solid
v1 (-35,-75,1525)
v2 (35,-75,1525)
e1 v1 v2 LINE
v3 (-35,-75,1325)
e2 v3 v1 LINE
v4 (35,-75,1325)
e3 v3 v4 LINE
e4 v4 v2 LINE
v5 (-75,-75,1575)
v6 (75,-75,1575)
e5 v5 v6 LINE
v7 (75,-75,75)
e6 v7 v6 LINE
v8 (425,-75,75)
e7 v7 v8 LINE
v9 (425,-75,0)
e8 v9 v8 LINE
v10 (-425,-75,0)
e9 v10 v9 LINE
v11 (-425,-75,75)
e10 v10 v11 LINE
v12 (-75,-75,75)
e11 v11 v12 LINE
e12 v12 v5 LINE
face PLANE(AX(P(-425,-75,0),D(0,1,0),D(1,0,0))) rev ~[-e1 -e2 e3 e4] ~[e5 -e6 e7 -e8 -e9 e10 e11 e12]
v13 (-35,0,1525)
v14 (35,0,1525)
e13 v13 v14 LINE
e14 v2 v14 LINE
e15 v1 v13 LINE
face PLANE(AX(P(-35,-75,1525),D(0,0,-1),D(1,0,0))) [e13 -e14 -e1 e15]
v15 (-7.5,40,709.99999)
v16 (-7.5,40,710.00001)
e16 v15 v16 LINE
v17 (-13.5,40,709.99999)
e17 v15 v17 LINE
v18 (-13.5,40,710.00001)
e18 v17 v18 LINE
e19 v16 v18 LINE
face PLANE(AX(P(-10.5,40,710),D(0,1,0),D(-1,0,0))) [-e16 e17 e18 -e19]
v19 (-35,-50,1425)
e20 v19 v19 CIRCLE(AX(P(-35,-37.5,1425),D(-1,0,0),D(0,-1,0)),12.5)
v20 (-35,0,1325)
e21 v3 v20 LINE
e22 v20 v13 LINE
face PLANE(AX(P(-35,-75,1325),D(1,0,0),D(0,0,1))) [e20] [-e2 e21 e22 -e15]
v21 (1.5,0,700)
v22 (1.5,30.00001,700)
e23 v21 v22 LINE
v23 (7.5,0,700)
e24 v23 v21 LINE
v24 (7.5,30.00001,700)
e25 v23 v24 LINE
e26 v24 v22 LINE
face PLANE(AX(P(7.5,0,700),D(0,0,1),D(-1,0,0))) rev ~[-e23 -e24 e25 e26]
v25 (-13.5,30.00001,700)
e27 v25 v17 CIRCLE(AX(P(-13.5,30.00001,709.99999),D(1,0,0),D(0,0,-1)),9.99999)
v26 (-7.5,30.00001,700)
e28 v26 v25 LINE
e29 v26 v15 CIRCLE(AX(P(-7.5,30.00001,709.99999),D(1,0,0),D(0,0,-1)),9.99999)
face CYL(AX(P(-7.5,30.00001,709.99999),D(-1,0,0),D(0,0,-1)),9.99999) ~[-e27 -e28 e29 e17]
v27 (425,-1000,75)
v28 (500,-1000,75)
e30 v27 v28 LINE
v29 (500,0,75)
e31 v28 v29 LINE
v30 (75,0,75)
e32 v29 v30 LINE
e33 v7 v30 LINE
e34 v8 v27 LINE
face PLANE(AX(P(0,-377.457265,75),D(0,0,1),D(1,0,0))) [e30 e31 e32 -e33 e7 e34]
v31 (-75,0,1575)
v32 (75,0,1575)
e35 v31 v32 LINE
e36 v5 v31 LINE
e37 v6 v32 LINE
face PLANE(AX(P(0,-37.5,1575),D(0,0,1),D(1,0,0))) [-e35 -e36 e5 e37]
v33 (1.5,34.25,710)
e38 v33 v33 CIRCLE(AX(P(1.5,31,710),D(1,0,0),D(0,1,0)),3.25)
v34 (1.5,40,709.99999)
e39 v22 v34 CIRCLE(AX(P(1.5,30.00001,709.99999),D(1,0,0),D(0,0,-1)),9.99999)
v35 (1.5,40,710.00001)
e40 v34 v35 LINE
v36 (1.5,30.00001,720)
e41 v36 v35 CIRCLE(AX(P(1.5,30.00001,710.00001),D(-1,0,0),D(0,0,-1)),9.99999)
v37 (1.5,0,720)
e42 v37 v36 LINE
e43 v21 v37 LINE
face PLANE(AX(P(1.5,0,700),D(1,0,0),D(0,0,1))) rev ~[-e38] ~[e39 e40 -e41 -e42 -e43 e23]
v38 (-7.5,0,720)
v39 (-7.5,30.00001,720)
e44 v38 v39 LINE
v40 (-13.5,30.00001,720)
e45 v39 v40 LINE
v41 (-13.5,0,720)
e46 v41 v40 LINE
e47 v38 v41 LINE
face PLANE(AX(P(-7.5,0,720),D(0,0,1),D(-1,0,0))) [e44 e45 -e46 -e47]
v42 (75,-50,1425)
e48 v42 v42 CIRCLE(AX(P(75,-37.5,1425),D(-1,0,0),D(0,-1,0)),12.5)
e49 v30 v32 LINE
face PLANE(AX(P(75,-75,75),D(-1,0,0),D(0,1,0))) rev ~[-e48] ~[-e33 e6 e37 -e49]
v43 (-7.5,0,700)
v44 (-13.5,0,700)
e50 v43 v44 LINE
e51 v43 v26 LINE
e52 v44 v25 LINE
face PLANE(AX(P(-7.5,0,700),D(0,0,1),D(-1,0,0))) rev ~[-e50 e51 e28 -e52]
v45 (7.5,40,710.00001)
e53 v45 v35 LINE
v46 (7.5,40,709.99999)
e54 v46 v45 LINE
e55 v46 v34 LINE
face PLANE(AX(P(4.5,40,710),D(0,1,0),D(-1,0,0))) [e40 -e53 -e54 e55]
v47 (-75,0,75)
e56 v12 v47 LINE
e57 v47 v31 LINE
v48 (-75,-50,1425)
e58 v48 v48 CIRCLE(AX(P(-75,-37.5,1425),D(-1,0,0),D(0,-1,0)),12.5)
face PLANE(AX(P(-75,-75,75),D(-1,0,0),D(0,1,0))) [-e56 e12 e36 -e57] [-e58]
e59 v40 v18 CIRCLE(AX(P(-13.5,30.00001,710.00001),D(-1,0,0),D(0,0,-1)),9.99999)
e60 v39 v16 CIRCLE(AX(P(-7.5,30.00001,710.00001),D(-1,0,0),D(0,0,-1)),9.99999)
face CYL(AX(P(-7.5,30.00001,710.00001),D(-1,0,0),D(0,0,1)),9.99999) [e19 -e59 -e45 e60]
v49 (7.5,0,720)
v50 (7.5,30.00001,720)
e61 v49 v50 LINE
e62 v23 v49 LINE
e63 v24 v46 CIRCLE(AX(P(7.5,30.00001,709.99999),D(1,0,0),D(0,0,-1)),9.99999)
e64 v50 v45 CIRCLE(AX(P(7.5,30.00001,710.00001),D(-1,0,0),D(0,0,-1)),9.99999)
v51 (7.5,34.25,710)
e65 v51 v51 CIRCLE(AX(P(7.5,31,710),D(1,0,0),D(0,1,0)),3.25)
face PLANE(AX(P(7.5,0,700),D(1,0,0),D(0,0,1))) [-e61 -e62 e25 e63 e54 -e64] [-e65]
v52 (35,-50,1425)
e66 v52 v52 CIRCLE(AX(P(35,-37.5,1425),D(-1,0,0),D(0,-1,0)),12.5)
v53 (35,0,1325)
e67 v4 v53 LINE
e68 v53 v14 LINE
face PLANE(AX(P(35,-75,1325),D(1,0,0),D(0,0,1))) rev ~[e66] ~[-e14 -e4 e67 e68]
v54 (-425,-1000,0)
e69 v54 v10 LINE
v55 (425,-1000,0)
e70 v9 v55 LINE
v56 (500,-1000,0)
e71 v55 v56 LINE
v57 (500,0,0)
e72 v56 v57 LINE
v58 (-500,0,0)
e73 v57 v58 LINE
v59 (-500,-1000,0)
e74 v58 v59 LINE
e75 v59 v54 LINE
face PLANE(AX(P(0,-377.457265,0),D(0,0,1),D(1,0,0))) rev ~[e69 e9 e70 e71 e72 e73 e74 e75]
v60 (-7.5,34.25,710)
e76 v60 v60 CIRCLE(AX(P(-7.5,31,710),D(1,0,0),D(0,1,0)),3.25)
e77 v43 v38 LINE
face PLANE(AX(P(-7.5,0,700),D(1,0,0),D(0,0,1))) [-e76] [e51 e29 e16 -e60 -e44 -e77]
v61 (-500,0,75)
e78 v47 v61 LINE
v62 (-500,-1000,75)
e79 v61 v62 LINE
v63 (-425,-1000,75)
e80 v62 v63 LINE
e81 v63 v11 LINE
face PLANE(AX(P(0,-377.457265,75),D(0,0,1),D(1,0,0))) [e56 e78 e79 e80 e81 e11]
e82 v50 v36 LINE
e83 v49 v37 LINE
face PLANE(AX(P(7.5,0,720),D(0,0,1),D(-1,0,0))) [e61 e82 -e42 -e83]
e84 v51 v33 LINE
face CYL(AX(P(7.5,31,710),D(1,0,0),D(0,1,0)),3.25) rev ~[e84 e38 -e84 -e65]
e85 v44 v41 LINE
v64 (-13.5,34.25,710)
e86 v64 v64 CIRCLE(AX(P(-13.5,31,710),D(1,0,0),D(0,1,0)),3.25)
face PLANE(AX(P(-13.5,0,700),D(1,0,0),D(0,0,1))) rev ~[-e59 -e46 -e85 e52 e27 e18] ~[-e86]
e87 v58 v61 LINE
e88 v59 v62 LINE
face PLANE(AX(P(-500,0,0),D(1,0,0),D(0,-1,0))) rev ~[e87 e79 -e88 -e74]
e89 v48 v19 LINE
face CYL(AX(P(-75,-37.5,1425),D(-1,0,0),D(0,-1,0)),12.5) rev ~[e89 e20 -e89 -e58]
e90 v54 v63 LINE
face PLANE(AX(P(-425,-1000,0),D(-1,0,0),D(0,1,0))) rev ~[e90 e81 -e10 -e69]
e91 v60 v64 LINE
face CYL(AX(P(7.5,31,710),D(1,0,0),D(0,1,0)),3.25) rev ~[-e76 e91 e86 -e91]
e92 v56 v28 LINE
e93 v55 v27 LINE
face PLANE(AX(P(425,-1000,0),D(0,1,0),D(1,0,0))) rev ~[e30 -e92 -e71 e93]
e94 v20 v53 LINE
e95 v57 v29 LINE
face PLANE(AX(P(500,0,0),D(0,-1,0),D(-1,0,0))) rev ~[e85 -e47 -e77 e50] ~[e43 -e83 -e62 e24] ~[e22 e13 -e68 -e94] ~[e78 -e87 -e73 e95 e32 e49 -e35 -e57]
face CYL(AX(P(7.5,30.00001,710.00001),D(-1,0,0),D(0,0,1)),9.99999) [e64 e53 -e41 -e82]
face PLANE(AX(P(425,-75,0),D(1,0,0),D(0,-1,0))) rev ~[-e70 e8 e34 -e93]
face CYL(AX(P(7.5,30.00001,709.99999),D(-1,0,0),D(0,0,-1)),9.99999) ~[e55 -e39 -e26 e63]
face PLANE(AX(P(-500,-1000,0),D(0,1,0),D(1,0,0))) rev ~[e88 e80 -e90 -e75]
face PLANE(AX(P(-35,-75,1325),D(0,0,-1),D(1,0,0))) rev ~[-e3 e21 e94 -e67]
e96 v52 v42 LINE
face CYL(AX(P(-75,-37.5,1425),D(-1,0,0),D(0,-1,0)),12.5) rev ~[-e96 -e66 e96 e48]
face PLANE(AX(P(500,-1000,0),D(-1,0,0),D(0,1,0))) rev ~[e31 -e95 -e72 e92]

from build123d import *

# Parameters (mm, degrees)
F1_DEPTH  = 75
F2_W      = 150
F2_H      = 75
F3_DEPTH  = 1500
F4_W      = 70
F4_H      = 200
F5_DEPTH  = 75.001
F6_W      = 6
F6_H      = 20
F7_DEPTH  = 40
F8_R      = 9.99999
F9_R      = 3.25
F10_DEPTH = 507.501
F12_R     = 12.5
F13_DEPTH = 575.001


# Not quite as in the source:
# - a fillet or chamfer is up to 0.001 mm smaller than in the source, because OpenCascade refuses the exact size
# - a feature of the source that left no trace in its solid (it failed there, or was rolled back) is left out


with BuildPart() as f1:
    # F0 (on Top) → F1 (new body)
    with BuildSketch(Plane.XY):
        Polygon((500, 0), (-500, 0), (-500, -1000), (-425, -1000), (-425, -75), (425, -75), (425, -1000), (500, -1000), align=None)
    extrude(amount=F1_DEPTH)

    # F2 (on face) → F3 (join)
    with BuildSketch(Plane.XY.offset(75)):
        with Locations((0, -37.5)):
            Rectangle(F2_W, F2_H)
    extrude(amount=F3_DEPTH)

    # F4 (on face) → F5 (cut, through all)
    with BuildSketch(Plane.XZ.offset(75)):
        with Locations((0, 1425)):
            Rectangle(F4_W, F4_H)
    extrude(amount=-F5_DEPTH, mode=Mode.SUBTRACT)

    # F6 (on face) → F7 (join)
    with BuildSketch(Plane(origin=(0, 0, 0), x_dir=(-1, 0, 0), z_dir=(0, 1, 0))):
        with Locations((-4.5, 710)):
            Rectangle(F6_W, F6_H)
        with Locations((10.5, 710)):
            Rectangle(F6_W, F6_H)
    extrude(amount=F7_DEPTH)

    # F8 (radius 10 in the source; OpenCascade refuses exactly that, so slightly less here)
    f8_edges = [f1.edges().sort_by_distance(p)[0] for p in [
        (4.5, 40, 720),
        (4.5, 40, 700),
        (-10.5, 40, 720),
        (-10.5, 40, 700),
    ]]
    fillet(f8_edges, radius=F8_R)

    # F9 (on face) → F10 (cut, through all)
    with BuildSketch(Plane.YZ.offset(7.5)):
        with Locations((31, 710)):
            Circle(F9_R)
    extrude(amount=-F10_DEPTH, mode=Mode.SUBTRACT)

    # F12 (on face) → F13 (cut, through all)
    with BuildSketch(Plane(origin=(-75, 0, 0), x_dir=(0, -1, 0), z_dir=(-1, 0, 0))):
        with Locations((37.5, 1425)):
            Circle(F12_R)
    extrude(amount=-F13_DEPTH, mode=Mode.SUBTRACT)


solid = f1.part
